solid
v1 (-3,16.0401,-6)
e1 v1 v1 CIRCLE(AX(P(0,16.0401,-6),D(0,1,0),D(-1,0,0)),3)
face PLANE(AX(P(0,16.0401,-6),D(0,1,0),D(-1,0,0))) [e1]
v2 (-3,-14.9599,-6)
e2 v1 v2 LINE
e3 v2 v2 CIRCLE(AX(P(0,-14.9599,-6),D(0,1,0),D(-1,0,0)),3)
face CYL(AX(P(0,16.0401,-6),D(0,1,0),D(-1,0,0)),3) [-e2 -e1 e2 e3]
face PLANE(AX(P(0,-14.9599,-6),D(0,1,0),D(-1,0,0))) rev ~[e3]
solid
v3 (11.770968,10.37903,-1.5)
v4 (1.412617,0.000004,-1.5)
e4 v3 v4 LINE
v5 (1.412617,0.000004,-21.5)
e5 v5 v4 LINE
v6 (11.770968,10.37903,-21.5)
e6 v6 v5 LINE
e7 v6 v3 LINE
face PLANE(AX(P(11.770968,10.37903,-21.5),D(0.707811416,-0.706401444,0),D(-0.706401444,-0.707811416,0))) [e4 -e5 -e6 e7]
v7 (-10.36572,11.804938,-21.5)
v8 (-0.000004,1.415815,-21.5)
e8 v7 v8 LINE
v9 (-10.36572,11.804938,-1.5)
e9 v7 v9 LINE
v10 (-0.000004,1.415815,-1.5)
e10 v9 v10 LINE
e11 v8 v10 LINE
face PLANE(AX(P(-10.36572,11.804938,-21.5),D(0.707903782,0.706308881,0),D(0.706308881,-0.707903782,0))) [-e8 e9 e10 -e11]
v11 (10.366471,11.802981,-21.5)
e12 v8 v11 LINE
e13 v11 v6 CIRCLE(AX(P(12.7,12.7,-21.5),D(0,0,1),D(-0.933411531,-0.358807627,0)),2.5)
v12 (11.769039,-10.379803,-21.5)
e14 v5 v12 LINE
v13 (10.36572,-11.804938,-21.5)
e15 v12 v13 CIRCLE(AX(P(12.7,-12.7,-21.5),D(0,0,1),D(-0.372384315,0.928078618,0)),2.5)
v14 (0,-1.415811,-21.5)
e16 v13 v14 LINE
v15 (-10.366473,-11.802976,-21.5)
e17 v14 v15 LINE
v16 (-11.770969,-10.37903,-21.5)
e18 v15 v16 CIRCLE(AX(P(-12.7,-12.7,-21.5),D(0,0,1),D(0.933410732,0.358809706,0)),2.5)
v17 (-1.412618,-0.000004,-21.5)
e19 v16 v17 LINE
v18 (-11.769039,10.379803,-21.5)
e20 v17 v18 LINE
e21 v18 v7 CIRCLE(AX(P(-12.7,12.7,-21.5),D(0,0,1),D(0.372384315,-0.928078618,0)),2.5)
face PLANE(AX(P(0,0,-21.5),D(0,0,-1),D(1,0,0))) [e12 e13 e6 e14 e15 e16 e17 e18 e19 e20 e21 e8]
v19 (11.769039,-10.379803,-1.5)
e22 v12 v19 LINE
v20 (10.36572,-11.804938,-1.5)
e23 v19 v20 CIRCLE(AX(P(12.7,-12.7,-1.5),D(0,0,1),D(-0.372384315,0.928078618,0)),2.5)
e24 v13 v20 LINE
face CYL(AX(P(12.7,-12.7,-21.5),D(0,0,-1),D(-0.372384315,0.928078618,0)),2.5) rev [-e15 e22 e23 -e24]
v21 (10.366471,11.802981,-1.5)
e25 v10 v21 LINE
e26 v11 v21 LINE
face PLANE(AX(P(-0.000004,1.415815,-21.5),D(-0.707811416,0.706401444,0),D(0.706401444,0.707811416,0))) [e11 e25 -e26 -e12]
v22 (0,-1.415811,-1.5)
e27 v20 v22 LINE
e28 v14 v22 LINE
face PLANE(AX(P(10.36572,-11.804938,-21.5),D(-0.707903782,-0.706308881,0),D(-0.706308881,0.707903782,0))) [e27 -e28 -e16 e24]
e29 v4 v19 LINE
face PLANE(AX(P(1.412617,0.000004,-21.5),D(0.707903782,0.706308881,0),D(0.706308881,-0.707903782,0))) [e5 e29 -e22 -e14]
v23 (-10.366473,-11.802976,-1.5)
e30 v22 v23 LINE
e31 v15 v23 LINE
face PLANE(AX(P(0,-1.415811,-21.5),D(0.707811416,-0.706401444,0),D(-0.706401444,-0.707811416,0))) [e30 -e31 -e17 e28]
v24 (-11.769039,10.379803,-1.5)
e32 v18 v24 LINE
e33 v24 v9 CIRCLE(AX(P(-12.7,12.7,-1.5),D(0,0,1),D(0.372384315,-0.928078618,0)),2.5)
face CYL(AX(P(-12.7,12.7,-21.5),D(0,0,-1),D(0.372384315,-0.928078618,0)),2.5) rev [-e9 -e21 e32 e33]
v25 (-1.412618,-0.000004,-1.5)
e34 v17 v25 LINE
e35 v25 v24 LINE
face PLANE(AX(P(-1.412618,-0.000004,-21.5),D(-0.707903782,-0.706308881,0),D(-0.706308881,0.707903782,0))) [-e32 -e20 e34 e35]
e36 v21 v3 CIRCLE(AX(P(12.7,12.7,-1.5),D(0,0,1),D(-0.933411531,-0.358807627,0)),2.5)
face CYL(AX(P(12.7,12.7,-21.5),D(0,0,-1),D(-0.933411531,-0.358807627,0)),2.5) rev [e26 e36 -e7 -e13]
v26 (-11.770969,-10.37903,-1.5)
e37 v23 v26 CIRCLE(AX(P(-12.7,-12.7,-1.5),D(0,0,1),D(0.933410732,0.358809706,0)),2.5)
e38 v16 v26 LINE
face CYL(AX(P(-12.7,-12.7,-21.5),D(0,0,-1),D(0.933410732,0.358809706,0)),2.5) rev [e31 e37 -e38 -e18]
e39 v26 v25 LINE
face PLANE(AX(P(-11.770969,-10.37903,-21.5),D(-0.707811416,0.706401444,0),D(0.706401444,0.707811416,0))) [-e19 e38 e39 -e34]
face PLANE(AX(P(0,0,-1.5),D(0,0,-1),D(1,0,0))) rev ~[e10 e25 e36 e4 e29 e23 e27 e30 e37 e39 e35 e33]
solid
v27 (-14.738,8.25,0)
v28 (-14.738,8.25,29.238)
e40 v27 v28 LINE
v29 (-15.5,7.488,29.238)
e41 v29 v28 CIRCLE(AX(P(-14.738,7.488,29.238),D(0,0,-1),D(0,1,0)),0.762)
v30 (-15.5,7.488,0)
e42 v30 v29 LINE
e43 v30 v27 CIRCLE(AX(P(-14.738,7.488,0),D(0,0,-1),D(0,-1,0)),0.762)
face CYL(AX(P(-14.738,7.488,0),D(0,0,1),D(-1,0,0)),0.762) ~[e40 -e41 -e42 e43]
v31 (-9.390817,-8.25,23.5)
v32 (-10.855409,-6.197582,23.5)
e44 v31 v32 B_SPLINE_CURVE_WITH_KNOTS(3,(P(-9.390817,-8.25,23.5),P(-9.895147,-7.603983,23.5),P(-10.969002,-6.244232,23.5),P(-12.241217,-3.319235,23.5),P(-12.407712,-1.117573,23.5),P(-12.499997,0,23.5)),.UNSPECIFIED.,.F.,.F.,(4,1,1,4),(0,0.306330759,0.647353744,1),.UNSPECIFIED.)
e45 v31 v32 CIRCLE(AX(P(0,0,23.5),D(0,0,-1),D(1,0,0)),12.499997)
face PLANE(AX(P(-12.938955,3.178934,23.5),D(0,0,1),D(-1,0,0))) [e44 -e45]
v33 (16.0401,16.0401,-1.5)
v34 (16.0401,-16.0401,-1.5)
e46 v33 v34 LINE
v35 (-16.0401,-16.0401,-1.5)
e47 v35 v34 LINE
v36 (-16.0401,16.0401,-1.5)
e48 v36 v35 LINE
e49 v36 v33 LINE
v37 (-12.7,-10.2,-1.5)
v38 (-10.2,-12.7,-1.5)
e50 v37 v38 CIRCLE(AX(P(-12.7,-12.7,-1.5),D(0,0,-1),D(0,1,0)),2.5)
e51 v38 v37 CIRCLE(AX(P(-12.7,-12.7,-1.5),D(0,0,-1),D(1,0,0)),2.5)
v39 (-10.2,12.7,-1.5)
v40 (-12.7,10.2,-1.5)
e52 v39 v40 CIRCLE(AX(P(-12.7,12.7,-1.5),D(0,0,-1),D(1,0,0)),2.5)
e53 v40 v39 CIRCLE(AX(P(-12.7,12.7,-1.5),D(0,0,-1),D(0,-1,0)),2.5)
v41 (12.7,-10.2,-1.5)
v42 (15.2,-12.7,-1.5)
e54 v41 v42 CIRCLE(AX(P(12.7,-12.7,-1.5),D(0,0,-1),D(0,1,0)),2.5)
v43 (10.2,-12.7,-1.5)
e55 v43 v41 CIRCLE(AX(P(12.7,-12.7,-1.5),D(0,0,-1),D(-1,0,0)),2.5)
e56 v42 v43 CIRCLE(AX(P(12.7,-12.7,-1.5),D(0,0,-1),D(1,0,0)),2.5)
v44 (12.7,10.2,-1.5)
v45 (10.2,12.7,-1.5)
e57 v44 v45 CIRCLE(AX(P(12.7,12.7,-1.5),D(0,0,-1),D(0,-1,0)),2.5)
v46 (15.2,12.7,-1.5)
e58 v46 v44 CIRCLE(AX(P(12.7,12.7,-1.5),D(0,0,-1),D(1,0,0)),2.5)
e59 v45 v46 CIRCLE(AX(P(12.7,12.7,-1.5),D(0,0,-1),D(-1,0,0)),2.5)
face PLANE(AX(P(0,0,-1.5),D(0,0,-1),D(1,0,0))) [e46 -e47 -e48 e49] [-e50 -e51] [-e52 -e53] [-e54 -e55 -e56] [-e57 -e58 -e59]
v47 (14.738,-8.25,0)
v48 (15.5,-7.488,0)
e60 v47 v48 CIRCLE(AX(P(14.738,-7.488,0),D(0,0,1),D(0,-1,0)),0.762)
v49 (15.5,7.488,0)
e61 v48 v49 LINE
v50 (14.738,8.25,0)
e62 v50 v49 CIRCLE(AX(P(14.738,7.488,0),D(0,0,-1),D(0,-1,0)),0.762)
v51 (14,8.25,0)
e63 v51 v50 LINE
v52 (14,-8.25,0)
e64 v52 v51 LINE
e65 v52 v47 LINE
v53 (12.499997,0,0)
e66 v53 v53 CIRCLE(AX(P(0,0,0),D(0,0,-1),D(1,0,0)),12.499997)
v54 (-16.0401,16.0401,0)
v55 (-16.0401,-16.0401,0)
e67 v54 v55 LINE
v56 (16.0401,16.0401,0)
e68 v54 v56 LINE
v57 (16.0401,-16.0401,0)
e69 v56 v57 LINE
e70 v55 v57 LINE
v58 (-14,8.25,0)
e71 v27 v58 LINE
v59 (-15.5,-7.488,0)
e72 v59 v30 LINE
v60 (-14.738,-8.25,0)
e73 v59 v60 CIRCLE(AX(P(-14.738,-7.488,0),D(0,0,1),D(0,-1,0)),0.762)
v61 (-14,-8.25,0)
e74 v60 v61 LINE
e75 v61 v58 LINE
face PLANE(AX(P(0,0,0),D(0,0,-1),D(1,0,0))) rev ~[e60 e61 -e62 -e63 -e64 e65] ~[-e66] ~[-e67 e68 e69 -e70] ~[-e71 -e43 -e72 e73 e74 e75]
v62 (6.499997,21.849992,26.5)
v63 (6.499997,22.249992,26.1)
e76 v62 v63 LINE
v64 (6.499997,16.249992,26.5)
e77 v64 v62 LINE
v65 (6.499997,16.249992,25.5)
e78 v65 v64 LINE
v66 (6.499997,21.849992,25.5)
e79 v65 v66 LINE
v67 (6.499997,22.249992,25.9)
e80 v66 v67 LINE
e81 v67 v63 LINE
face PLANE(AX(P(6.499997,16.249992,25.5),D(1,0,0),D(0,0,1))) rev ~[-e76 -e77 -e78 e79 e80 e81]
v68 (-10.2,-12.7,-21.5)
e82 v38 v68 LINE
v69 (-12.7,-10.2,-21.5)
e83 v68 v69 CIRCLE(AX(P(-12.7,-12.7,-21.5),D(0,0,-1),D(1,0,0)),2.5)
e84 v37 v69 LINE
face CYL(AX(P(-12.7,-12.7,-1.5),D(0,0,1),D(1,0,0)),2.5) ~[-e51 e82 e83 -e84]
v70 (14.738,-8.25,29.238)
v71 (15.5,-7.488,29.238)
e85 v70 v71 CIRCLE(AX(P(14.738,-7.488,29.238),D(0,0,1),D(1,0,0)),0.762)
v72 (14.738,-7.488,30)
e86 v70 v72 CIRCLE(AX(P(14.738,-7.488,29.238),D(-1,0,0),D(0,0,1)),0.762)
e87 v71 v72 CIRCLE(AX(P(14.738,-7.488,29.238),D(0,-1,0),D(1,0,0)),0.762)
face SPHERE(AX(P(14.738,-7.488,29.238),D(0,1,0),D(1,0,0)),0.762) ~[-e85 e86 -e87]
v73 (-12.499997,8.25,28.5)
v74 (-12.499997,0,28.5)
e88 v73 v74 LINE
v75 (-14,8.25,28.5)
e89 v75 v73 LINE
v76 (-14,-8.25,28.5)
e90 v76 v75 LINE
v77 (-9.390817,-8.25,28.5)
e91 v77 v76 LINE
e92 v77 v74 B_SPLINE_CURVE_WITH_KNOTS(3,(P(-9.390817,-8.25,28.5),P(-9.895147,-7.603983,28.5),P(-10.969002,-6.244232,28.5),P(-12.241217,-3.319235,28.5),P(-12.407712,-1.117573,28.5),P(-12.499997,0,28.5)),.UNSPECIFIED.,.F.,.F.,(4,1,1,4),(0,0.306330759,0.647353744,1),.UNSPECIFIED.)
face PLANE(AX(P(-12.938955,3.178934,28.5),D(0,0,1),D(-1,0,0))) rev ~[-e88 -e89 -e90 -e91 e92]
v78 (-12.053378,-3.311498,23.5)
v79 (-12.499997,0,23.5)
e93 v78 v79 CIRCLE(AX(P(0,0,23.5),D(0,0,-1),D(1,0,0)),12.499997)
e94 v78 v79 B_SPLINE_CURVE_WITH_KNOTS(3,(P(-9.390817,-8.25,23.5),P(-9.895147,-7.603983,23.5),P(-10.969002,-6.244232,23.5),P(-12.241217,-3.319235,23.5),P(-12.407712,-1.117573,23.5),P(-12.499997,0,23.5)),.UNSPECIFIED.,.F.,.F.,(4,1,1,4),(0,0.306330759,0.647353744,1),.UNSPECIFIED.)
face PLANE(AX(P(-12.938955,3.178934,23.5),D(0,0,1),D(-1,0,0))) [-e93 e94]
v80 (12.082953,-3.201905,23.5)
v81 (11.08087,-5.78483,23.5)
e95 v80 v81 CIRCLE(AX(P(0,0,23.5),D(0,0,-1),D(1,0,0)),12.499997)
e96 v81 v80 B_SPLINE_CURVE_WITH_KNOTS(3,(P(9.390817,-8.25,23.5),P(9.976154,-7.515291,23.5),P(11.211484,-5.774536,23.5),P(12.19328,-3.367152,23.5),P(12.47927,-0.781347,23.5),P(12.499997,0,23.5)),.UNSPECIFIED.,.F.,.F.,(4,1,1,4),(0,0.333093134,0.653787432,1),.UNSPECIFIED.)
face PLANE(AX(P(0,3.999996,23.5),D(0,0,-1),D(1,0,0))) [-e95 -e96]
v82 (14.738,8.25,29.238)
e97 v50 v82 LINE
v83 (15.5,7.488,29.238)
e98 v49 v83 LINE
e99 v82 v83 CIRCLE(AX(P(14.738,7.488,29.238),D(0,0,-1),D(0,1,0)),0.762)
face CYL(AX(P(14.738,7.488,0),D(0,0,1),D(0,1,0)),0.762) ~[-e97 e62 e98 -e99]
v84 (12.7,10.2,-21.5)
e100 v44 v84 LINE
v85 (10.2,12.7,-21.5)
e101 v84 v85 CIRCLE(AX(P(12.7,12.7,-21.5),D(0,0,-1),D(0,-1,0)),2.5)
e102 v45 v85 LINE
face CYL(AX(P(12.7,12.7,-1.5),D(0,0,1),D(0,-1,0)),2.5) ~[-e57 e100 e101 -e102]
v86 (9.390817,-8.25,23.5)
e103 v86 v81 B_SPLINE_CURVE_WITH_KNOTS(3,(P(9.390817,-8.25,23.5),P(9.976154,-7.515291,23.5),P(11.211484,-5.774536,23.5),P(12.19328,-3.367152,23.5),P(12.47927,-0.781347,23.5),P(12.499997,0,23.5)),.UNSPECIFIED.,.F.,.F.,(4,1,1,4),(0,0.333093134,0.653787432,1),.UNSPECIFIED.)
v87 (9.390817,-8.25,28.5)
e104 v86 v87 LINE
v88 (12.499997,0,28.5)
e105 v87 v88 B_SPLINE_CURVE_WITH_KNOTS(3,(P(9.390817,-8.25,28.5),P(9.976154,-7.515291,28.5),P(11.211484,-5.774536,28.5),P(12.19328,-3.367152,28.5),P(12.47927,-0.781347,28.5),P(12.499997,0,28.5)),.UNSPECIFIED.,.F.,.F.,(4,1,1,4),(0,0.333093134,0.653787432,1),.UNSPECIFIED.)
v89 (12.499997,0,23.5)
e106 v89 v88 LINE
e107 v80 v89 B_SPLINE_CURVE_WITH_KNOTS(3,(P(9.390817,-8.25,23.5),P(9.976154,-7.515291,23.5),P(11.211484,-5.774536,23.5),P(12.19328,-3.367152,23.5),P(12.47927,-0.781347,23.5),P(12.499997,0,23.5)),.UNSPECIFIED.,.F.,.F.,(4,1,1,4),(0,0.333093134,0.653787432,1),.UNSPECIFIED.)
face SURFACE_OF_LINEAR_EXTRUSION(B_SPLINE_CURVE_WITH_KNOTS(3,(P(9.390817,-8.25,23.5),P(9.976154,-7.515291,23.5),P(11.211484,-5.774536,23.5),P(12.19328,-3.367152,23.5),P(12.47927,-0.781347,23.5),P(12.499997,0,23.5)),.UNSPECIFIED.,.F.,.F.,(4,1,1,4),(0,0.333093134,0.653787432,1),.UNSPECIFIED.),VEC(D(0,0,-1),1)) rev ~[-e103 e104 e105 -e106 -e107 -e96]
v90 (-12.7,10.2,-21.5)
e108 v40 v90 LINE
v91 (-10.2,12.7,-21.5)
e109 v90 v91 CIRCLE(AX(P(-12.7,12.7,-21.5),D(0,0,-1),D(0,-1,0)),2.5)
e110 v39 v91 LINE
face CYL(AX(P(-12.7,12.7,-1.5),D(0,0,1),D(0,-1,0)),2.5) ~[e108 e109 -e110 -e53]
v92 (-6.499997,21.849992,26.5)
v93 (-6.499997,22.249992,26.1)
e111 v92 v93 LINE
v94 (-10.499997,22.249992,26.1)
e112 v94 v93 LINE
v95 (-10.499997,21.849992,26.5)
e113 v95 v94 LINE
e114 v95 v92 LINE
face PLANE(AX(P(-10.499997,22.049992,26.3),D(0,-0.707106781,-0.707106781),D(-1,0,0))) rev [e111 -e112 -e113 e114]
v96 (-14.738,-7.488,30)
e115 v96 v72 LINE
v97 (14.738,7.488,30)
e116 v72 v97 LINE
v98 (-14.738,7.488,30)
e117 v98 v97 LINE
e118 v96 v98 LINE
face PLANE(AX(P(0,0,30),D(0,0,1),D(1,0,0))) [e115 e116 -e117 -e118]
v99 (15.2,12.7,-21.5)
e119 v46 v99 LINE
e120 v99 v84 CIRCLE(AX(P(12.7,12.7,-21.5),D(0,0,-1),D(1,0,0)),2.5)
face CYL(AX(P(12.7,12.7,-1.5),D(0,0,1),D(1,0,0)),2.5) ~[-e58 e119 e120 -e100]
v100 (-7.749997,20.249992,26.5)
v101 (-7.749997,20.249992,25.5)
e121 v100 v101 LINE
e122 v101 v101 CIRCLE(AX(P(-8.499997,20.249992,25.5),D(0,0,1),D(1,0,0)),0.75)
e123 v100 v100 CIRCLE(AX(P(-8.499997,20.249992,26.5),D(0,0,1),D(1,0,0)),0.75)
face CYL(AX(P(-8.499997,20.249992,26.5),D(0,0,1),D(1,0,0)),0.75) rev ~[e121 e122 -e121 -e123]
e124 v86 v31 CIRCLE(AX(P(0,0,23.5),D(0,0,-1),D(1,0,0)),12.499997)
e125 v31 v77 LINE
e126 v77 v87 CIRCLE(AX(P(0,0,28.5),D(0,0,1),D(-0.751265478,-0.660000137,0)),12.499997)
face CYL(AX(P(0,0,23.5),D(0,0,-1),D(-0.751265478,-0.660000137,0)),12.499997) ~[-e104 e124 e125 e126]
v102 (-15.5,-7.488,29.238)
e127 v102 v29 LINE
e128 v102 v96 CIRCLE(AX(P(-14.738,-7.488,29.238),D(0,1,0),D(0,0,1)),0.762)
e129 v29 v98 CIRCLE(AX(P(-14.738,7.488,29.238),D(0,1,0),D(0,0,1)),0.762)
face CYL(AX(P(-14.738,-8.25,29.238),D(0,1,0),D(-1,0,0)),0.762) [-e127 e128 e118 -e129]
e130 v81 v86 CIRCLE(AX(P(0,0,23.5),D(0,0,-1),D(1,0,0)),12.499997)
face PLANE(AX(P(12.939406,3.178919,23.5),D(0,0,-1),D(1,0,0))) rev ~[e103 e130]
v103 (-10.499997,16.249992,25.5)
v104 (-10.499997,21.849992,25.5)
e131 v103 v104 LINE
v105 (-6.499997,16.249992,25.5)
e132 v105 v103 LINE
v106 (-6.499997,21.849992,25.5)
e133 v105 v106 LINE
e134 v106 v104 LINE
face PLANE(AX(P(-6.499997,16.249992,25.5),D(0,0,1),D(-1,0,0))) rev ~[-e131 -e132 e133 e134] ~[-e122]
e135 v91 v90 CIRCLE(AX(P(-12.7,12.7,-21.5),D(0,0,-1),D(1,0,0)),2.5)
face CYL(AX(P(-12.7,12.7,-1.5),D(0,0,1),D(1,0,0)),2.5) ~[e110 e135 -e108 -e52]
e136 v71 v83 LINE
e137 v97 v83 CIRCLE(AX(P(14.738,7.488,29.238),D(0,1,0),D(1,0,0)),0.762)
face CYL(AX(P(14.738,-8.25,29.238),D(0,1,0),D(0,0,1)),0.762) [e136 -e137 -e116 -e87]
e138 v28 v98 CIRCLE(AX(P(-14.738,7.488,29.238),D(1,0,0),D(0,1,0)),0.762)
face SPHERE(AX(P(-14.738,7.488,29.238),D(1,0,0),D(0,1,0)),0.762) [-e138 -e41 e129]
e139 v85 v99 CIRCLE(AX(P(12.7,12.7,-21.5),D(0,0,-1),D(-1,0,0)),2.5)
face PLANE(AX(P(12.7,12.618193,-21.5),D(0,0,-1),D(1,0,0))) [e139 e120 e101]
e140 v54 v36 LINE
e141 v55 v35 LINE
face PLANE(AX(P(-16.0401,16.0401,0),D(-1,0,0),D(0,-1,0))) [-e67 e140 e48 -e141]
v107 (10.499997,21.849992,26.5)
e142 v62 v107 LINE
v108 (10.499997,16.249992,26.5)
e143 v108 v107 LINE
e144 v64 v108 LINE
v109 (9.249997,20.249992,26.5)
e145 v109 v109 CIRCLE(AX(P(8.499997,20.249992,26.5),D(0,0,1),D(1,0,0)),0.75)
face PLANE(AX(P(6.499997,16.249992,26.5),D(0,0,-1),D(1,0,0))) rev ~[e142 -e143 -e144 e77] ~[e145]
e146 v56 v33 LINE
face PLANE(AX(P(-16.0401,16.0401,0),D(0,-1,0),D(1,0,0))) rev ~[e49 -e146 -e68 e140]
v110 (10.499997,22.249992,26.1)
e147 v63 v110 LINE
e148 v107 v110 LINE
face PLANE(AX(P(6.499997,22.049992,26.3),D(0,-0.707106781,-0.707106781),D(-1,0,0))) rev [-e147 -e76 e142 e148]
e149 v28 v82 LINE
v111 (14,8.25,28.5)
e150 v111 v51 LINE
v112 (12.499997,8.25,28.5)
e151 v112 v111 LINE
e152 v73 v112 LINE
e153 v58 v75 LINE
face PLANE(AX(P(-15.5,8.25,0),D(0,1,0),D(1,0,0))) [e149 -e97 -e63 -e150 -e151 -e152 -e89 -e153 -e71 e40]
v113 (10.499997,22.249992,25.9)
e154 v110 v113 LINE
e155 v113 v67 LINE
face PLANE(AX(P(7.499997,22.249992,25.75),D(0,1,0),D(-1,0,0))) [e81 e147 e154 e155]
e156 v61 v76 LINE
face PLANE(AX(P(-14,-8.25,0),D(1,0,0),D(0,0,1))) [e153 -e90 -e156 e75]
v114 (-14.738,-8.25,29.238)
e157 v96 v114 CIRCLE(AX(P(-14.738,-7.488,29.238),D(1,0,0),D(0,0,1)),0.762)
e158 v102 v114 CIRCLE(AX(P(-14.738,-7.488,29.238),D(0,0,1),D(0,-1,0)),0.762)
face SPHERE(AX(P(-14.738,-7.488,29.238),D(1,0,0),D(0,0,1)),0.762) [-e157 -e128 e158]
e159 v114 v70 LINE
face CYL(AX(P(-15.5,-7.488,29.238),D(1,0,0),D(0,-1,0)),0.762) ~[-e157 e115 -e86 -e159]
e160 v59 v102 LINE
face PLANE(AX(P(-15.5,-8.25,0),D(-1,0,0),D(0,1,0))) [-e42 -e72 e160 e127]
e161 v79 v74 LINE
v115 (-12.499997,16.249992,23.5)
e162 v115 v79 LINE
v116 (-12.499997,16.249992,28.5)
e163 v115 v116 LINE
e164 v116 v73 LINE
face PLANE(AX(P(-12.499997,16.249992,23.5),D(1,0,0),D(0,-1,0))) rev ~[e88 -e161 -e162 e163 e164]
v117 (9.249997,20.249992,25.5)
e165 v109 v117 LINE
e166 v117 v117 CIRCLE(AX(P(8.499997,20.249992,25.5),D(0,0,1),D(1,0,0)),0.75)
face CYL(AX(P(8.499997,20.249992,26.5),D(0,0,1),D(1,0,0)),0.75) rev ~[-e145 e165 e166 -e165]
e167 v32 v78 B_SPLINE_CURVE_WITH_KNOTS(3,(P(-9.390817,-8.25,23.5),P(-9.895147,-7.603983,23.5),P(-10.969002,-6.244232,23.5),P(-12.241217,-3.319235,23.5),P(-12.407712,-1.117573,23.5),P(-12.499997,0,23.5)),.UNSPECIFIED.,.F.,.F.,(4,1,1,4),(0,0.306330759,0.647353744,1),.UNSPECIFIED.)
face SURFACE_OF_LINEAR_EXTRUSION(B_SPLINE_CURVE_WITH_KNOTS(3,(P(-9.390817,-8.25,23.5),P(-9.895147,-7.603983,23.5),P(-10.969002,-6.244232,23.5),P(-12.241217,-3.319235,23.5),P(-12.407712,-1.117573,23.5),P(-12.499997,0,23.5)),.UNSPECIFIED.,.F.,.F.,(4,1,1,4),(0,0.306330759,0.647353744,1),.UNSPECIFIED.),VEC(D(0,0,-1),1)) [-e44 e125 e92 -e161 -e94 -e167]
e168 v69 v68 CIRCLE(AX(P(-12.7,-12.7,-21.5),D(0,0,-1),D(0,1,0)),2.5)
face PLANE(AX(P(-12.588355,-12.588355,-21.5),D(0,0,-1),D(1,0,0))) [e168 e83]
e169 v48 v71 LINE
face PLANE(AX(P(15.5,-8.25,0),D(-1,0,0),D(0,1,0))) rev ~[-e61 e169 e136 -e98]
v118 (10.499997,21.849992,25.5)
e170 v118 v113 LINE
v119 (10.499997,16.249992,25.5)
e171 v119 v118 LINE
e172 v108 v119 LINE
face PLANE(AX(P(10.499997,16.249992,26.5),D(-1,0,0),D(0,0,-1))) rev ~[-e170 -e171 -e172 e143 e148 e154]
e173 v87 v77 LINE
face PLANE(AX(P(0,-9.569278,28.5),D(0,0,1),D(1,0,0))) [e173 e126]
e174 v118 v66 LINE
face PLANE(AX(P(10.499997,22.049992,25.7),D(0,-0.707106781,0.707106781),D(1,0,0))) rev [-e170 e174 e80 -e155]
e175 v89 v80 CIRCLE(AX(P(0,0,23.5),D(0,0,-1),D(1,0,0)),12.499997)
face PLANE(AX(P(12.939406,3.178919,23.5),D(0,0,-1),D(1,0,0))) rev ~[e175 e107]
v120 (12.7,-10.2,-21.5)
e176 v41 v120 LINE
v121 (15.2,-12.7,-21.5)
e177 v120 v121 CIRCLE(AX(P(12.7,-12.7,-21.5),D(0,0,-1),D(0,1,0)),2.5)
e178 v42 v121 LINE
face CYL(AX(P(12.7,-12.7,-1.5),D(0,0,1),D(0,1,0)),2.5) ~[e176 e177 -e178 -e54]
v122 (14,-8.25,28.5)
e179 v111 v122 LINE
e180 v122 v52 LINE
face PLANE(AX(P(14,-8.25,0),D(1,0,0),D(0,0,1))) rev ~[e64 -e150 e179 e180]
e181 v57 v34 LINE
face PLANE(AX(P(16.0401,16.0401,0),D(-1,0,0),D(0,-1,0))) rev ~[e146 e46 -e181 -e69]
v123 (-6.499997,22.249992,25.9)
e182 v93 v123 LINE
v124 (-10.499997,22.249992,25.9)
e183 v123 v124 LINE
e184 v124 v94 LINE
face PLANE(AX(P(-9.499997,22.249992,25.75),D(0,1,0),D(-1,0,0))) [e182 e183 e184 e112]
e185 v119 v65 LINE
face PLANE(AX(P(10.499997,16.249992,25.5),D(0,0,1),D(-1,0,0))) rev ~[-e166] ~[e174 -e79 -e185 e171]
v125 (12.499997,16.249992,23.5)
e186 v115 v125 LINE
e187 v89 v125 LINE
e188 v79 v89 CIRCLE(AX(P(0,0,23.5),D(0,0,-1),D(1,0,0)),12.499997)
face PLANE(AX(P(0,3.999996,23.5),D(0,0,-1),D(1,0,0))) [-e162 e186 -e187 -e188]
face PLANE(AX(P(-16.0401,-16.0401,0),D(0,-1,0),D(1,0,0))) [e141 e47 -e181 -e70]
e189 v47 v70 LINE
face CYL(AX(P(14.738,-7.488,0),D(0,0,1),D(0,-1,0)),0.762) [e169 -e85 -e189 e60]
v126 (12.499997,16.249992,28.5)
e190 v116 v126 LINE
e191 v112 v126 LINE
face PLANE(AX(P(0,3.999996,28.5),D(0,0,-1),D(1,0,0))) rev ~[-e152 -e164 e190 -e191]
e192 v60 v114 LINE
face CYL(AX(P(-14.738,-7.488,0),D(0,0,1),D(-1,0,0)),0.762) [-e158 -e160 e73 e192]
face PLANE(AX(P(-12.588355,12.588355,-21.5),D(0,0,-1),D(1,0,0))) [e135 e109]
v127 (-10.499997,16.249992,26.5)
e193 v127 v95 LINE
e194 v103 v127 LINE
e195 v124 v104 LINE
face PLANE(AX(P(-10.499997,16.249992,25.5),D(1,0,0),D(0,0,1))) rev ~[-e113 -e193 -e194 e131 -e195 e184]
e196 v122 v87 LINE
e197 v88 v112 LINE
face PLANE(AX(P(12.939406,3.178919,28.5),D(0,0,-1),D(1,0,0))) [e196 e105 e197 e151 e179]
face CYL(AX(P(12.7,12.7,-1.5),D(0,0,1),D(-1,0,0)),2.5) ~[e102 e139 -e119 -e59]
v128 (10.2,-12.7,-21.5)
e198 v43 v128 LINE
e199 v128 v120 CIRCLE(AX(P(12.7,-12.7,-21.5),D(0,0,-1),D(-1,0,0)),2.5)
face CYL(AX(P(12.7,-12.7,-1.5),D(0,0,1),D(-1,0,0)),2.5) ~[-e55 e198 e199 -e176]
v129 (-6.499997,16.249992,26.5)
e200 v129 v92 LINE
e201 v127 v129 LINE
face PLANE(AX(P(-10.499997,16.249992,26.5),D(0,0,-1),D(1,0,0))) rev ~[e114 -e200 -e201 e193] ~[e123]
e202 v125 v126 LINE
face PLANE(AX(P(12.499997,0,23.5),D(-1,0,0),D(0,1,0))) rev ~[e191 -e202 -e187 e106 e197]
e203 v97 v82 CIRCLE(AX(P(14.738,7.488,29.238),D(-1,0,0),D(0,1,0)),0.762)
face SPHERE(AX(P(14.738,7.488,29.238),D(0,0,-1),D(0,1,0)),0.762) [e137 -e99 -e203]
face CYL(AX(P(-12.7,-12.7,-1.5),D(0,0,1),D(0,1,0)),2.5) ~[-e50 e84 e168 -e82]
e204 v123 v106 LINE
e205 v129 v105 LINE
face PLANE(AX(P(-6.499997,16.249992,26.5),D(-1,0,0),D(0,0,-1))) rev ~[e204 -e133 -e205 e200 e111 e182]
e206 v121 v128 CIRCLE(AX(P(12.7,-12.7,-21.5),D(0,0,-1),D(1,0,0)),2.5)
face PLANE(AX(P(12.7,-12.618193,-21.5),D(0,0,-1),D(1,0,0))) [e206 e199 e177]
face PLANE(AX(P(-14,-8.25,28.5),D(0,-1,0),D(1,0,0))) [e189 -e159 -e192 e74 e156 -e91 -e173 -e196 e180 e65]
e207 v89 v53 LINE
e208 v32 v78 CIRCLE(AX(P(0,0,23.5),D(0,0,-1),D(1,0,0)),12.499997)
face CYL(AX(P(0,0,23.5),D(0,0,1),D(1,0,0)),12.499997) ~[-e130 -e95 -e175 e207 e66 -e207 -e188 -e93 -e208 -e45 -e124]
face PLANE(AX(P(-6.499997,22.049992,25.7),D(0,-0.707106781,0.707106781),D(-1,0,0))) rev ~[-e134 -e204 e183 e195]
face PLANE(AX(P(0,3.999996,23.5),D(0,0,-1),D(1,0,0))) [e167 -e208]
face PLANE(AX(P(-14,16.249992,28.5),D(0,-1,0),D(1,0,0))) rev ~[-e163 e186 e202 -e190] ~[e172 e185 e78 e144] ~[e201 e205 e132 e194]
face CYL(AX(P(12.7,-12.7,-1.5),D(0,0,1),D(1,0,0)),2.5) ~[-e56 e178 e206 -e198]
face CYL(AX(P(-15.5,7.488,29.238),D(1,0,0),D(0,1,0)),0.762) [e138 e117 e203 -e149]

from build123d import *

# Parameters (mm, degrees)
F0_W      = 31
F0_H      = 16.5
F1_DEPTH  = 30
F2_W      = 28
F2_H      = 28.5
F3_DEPTH  = 16.5
F4_R      = 0.762
F5_W      = 28
F5_H      = 24.4999924
F6_DEPTH  = 5
F7_R      = 12.4999974
F8_DEPTH  = 23.5
F10_DEPTH = 5
F11_W     = 2
F11_H     = 0.5
F12_DEPTH = 6
F13_R     = 0.75
F14_DEPTH = 1
F15_SIZE  = 0.4
F16_SIZE  = 0.4
F18_DEPTH = 5
F19_W     = 32.0802
F19_H     = 32.0802
F20_DEPTH = 1.5
F22_DEPTH = 20
F26_DEPTH = 20
F27_R     = 3
F28_DEPTH = 31


# Not quite as in the source:
# - a feature of the source that left no trace in its solid (it failed there, or was rolled back) is left out


with BuildPart() as f1:
    # F0 (on Top) → F1 (new body)
    with BuildSketch(Plane.XY):
        Rectangle(F0_W, F0_H)
    extrude(amount=F1_DEPTH)

    # F2 (on face) → F3 (cut, through all)
    with BuildSketch(Plane.XZ.offset(8.25)):
        with Locations((0, 14.25)):
            Rectangle(F2_W, F2_H)
    extrude(amount=-F3_DEPTH, mode=Mode.SUBTRACT)

    # F4
    f4_edges = [f1.edges().sort_by_distance(p)[0] for p in [
        (15.5, 8.25, 15),
        (0, 8.25, 30),
        (-15.5, 8.25, 15),
        (15.5, 0, 30),
        (15.5, -8.25, 15),
        (0, -8.25, 30),
        (-15.5, 0, 30),
        (-15.5, -8.25, 15),
    ]]
    fillet(f4_edges, radius=F4_R)

    # F5 (on face) → F6 (join)
    with BuildSketch(Plane(origin=(0, 0, 28.5), x_dir=(1, 0, 0), z_dir=(0, 0, -1))):
        with Locations((0, -3.9999962)):
            Rectangle(F5_W, F5_H)
    extrude(amount=F6_DEPTH)

    # F7 (on face) → F8 (join)
    with BuildSketch(Plane(origin=(0, 0, 23.5), x_dir=(1, 0, 0), z_dir=(0, 0, -1))):
        Circle(F7_R)
    extrude(amount=F8_DEPTH)

    # F9 (on face) → F10 (cut)
    with BuildSketch(Plane(origin=(0, 0, 23.5), x_dir=(1, 0, 0), z_dir=(0, 0, -1))):
        with BuildLine():
            add(Edge.make_bspline(
                [(9.3908165247, 8.25), (9.9761542333, 7.5152910471), (11.2114839399, 5.7745359804), (12.1932801678, 3.3671524419), (12.4792695901, 0.7813469518), (12.4999974, 0)],
                knots=[0, 0, 0, 0, 0.3330931337, 0.6537874323, 1, 1, 1, 1], degree=3))
            Line((12.4999974, 0), (12.4999974, -16.2499924))
            Line((12.4999974, -16.2499924), (14, -16.2499924))
            Line((14, -16.2499924), (14, 8.25))
            Line((14, 8.25), (9.3908165247, 8.25))
        make_face()
        with BuildLine():
            add(Edge.make_bspline(
                [(-9.3908165247, 8.25), (-9.8951466827, 7.6039833324), (-10.9690015511, 6.2442324236), (-12.2412171784, 3.3192353758), (-12.4077121811, 1.117573176), (-12.4999974, 0)],
                knots=[0, 0, 0, 0, 0.3063307587, 0.6473537439, 1, 1, 1, 1], degree=3))
            Line((-9.3908165247, 8.25), (-14, 8.25))
            Line((-14, 8.25), (-14, -16.2499924))
            Line((-14, -16.2499924), (-12.4999974, -16.2499924))
            Line((-12.4999974, -16.2499924), (-12.4999974, 0))
        make_face()
    extrude(amount=-F10_DEPTH, mode=Mode.SUBTRACT)

    # F11 (on face) → F12 (join)
    with BuildSketch(Plane(origin=(0, 16.2499924, 0), x_dir=(-1, 0, 0), z_dir=(0, 1, 0))):
        with Locations((-7.4999974, 25.75)):
            Rectangle(F11_W, F11_H)
        with Locations((-7.4999974, 26.25)):
            Rectangle(F11_W, F11_H)
        with Locations((9.4999974, 25.75)):
            Rectangle(F11_W, F11_H)
        with Locations((7.4999974, 25.75)):
            Rectangle(F11_W, F11_H)
        with Locations((9.4999974, 26.25)):
            Rectangle(F11_W, F11_H)
        with Locations((7.4999974, 26.25)):
            Rectangle(F11_W, F11_H)
        with Locations((-9.4999974, 25.75)):
            Rectangle(F11_W, F11_H)
        with Locations((-9.4999974, 26.25)):
            Rectangle(F11_W, F11_H)
    extrude(amount=F12_DEPTH)

    # F13 (on face) → F14 (cut, through all)
    with BuildSketch(Plane.XY.offset(26.5)):
        with Locations((8.4999974, 20.2499924)):
            Circle(F13_R)
        with Locations((-8.4999974, 20.2499924)):
            Circle(F13_R)
    extrude(amount=-F14_DEPTH, mode=Mode.SUBTRACT)

    # F15
    f15_edges = [f1.edges().sort_by_distance(p)[0] for p in [
        (8.499997, 22.249992, 26.5),
        (-8.499997, 22.249992, 26.5),
    ]]
    chamfer(f15_edges, length=F15_SIZE)

    # F16
    f16_edges = [f1.edges().sort_by_distance(p)[0] for p in [
        (8.499997, 22.249992, 25.5),
        (-8.499997, 22.249992, 25.5),
    ]]
    chamfer(f16_edges, length=F16_SIZE)

    # F17 (on face) → F18 (join)
    with BuildSketch(Plane.XY.offset(23.5)):
        with BuildLine():
            Line((9.3908165247, -8.25), (-9.3908165247, -8.25))
            ThreePointArc((-9.3908165247, -8.25), (0, -12.4999974), (9.3908165247, -8.25))
        make_face()
    extrude(amount=F18_DEPTH)

    # F19 (on face) → F20 (join)
    with BuildSketch(Plane(origin=(0, 0, 0), x_dir=(1, 0, 0), z_dir=(0, 0, -1))):
        Rectangle(F19_W, F19_H)
    extrude(amount=F20_DEPTH)

    # F21 (on face) → F22 (join)
    with BuildSketch(Plane(origin=(0, 0, -1.5), x_dir=(1, 0, 0), z_dir=(0, 0, -1))):
        with BuildLine():
            ThreePointArc((-10.2, -12.7), (-10.932233047, -10.932233047), (-12.7, -10.2))
            ThreePointArc((-12.7, -10.2), (-14.467766953, -14.467766953), (-10.2, -12.7))
        make_face()
        with BuildLine():
            ThreePointArc((-12.7, 10.2), (-10.932233047, 10.932233047), (-10.2, 12.7))
            ThreePointArc((-10.2, 12.7), (-14.467766953, 14.467766953), (-12.7, 10.2))
        make_face()
        with BuildLine():
            ThreePointArc((12.7, 10.2), (14.467766953, 10.932233047), (15.2, 12.7))
            ThreePointArc((15.2, 12.7), (12.7, 15.2), (10.2, 12.7))
            ThreePointArc((10.2, 12.7), (10.932233047, 10.932233047), (12.7, 10.2))
        make_face()
        with BuildLine():
            ThreePointArc((15.2, -12.7), (14.467766953, -10.932233047), (12.7, -10.2))
            ThreePointArc((12.7, -10.2), (10.932233047, -10.932233047), (10.2, -12.7))
            ThreePointArc((10.2, -12.7), (12.7, -15.2), (15.2, -12.7))
        make_face()
    extrude(amount=F22_DEPTH)


with BuildPart() as f26:
    # F25 (on face) → F26 (new body)
    with BuildSketch(Plane(origin=(0, 0, -21.5), x_dir=(1, 0, 0), z_dir=(0, 0, -1))):
        with BuildLine():
            ThreePointArc((-11.7690392124, -10.379803454), (-10.9186518108, -10.945919435), (-10.3657199255, -11.8049376927))
            Line((-10.3657199255, -11.8049376927), (-3.5923e-06, -1.4158147652))
            Line((-3.5923e-06, -1.4158147652), (1.4126173591, -4.0058e-06))
            Line((1.4126173591, -4.0058e-06), (11.7690392124, 10.379803454))
            ThreePointArc((11.7690392124, 10.379803454), (10.9186518108, 10.945919435), (10.3657199255, 11.8049376927))
            Line((10.3657199255, 11.8049376927), (0, 1.4158111649))
            Line((0, 1.4158111649), (-1.4126177626, 3.6014e-06))
            Line((-1.4126177626, 3.6014e-06), (-11.7690392124, -10.379803454))
        make_face()
        with BuildLine():
            Line((1.4126173591, -4.0058e-06), (-3.5923e-06, -1.4158147652))
            Line((-3.5923e-06, -1.4158147652), (10.3664711716, -11.8029809328))
            ThreePointArc((10.3664711716, -11.8029809328), (10.9201168847, -10.9444328279), (11.7709684555, -10.3790302912))
            Line((11.7709684555, -10.3790302912), (1.4126173591, -4.0058e-06))
        make_face()
        with BuildLine():
            Line((-11.7709690322, 10.3790300603), (-1.4126177626, 3.6014e-06))
            Line((-1.4126177626, 3.6014e-06), (0, 1.4158111649))
            Line((0, 1.4158111649), (-10.3664731696, 11.8029757351))
            ThreePointArc((-10.3664731696, 11.8029757351), (-10.920119058, 10.9444306245), (-11.7709690322, 10.3790300603))
        make_face()
    extrude(amount=-F26_DEPTH)


with BuildPart() as f28:
    # F27 (on face) → F28 (new body)
    with BuildSketch(Plane(origin=(0, 16.0401, 0), x_dir=(-1, 0, 0), z_dir=(0, 1, 0))):
        with Locations((0, -6)):
            Circle(F27_R)
    extrude(amount=-F28_DEPTH)


solid = Compound([f1.part, f26.part, f28.part])
